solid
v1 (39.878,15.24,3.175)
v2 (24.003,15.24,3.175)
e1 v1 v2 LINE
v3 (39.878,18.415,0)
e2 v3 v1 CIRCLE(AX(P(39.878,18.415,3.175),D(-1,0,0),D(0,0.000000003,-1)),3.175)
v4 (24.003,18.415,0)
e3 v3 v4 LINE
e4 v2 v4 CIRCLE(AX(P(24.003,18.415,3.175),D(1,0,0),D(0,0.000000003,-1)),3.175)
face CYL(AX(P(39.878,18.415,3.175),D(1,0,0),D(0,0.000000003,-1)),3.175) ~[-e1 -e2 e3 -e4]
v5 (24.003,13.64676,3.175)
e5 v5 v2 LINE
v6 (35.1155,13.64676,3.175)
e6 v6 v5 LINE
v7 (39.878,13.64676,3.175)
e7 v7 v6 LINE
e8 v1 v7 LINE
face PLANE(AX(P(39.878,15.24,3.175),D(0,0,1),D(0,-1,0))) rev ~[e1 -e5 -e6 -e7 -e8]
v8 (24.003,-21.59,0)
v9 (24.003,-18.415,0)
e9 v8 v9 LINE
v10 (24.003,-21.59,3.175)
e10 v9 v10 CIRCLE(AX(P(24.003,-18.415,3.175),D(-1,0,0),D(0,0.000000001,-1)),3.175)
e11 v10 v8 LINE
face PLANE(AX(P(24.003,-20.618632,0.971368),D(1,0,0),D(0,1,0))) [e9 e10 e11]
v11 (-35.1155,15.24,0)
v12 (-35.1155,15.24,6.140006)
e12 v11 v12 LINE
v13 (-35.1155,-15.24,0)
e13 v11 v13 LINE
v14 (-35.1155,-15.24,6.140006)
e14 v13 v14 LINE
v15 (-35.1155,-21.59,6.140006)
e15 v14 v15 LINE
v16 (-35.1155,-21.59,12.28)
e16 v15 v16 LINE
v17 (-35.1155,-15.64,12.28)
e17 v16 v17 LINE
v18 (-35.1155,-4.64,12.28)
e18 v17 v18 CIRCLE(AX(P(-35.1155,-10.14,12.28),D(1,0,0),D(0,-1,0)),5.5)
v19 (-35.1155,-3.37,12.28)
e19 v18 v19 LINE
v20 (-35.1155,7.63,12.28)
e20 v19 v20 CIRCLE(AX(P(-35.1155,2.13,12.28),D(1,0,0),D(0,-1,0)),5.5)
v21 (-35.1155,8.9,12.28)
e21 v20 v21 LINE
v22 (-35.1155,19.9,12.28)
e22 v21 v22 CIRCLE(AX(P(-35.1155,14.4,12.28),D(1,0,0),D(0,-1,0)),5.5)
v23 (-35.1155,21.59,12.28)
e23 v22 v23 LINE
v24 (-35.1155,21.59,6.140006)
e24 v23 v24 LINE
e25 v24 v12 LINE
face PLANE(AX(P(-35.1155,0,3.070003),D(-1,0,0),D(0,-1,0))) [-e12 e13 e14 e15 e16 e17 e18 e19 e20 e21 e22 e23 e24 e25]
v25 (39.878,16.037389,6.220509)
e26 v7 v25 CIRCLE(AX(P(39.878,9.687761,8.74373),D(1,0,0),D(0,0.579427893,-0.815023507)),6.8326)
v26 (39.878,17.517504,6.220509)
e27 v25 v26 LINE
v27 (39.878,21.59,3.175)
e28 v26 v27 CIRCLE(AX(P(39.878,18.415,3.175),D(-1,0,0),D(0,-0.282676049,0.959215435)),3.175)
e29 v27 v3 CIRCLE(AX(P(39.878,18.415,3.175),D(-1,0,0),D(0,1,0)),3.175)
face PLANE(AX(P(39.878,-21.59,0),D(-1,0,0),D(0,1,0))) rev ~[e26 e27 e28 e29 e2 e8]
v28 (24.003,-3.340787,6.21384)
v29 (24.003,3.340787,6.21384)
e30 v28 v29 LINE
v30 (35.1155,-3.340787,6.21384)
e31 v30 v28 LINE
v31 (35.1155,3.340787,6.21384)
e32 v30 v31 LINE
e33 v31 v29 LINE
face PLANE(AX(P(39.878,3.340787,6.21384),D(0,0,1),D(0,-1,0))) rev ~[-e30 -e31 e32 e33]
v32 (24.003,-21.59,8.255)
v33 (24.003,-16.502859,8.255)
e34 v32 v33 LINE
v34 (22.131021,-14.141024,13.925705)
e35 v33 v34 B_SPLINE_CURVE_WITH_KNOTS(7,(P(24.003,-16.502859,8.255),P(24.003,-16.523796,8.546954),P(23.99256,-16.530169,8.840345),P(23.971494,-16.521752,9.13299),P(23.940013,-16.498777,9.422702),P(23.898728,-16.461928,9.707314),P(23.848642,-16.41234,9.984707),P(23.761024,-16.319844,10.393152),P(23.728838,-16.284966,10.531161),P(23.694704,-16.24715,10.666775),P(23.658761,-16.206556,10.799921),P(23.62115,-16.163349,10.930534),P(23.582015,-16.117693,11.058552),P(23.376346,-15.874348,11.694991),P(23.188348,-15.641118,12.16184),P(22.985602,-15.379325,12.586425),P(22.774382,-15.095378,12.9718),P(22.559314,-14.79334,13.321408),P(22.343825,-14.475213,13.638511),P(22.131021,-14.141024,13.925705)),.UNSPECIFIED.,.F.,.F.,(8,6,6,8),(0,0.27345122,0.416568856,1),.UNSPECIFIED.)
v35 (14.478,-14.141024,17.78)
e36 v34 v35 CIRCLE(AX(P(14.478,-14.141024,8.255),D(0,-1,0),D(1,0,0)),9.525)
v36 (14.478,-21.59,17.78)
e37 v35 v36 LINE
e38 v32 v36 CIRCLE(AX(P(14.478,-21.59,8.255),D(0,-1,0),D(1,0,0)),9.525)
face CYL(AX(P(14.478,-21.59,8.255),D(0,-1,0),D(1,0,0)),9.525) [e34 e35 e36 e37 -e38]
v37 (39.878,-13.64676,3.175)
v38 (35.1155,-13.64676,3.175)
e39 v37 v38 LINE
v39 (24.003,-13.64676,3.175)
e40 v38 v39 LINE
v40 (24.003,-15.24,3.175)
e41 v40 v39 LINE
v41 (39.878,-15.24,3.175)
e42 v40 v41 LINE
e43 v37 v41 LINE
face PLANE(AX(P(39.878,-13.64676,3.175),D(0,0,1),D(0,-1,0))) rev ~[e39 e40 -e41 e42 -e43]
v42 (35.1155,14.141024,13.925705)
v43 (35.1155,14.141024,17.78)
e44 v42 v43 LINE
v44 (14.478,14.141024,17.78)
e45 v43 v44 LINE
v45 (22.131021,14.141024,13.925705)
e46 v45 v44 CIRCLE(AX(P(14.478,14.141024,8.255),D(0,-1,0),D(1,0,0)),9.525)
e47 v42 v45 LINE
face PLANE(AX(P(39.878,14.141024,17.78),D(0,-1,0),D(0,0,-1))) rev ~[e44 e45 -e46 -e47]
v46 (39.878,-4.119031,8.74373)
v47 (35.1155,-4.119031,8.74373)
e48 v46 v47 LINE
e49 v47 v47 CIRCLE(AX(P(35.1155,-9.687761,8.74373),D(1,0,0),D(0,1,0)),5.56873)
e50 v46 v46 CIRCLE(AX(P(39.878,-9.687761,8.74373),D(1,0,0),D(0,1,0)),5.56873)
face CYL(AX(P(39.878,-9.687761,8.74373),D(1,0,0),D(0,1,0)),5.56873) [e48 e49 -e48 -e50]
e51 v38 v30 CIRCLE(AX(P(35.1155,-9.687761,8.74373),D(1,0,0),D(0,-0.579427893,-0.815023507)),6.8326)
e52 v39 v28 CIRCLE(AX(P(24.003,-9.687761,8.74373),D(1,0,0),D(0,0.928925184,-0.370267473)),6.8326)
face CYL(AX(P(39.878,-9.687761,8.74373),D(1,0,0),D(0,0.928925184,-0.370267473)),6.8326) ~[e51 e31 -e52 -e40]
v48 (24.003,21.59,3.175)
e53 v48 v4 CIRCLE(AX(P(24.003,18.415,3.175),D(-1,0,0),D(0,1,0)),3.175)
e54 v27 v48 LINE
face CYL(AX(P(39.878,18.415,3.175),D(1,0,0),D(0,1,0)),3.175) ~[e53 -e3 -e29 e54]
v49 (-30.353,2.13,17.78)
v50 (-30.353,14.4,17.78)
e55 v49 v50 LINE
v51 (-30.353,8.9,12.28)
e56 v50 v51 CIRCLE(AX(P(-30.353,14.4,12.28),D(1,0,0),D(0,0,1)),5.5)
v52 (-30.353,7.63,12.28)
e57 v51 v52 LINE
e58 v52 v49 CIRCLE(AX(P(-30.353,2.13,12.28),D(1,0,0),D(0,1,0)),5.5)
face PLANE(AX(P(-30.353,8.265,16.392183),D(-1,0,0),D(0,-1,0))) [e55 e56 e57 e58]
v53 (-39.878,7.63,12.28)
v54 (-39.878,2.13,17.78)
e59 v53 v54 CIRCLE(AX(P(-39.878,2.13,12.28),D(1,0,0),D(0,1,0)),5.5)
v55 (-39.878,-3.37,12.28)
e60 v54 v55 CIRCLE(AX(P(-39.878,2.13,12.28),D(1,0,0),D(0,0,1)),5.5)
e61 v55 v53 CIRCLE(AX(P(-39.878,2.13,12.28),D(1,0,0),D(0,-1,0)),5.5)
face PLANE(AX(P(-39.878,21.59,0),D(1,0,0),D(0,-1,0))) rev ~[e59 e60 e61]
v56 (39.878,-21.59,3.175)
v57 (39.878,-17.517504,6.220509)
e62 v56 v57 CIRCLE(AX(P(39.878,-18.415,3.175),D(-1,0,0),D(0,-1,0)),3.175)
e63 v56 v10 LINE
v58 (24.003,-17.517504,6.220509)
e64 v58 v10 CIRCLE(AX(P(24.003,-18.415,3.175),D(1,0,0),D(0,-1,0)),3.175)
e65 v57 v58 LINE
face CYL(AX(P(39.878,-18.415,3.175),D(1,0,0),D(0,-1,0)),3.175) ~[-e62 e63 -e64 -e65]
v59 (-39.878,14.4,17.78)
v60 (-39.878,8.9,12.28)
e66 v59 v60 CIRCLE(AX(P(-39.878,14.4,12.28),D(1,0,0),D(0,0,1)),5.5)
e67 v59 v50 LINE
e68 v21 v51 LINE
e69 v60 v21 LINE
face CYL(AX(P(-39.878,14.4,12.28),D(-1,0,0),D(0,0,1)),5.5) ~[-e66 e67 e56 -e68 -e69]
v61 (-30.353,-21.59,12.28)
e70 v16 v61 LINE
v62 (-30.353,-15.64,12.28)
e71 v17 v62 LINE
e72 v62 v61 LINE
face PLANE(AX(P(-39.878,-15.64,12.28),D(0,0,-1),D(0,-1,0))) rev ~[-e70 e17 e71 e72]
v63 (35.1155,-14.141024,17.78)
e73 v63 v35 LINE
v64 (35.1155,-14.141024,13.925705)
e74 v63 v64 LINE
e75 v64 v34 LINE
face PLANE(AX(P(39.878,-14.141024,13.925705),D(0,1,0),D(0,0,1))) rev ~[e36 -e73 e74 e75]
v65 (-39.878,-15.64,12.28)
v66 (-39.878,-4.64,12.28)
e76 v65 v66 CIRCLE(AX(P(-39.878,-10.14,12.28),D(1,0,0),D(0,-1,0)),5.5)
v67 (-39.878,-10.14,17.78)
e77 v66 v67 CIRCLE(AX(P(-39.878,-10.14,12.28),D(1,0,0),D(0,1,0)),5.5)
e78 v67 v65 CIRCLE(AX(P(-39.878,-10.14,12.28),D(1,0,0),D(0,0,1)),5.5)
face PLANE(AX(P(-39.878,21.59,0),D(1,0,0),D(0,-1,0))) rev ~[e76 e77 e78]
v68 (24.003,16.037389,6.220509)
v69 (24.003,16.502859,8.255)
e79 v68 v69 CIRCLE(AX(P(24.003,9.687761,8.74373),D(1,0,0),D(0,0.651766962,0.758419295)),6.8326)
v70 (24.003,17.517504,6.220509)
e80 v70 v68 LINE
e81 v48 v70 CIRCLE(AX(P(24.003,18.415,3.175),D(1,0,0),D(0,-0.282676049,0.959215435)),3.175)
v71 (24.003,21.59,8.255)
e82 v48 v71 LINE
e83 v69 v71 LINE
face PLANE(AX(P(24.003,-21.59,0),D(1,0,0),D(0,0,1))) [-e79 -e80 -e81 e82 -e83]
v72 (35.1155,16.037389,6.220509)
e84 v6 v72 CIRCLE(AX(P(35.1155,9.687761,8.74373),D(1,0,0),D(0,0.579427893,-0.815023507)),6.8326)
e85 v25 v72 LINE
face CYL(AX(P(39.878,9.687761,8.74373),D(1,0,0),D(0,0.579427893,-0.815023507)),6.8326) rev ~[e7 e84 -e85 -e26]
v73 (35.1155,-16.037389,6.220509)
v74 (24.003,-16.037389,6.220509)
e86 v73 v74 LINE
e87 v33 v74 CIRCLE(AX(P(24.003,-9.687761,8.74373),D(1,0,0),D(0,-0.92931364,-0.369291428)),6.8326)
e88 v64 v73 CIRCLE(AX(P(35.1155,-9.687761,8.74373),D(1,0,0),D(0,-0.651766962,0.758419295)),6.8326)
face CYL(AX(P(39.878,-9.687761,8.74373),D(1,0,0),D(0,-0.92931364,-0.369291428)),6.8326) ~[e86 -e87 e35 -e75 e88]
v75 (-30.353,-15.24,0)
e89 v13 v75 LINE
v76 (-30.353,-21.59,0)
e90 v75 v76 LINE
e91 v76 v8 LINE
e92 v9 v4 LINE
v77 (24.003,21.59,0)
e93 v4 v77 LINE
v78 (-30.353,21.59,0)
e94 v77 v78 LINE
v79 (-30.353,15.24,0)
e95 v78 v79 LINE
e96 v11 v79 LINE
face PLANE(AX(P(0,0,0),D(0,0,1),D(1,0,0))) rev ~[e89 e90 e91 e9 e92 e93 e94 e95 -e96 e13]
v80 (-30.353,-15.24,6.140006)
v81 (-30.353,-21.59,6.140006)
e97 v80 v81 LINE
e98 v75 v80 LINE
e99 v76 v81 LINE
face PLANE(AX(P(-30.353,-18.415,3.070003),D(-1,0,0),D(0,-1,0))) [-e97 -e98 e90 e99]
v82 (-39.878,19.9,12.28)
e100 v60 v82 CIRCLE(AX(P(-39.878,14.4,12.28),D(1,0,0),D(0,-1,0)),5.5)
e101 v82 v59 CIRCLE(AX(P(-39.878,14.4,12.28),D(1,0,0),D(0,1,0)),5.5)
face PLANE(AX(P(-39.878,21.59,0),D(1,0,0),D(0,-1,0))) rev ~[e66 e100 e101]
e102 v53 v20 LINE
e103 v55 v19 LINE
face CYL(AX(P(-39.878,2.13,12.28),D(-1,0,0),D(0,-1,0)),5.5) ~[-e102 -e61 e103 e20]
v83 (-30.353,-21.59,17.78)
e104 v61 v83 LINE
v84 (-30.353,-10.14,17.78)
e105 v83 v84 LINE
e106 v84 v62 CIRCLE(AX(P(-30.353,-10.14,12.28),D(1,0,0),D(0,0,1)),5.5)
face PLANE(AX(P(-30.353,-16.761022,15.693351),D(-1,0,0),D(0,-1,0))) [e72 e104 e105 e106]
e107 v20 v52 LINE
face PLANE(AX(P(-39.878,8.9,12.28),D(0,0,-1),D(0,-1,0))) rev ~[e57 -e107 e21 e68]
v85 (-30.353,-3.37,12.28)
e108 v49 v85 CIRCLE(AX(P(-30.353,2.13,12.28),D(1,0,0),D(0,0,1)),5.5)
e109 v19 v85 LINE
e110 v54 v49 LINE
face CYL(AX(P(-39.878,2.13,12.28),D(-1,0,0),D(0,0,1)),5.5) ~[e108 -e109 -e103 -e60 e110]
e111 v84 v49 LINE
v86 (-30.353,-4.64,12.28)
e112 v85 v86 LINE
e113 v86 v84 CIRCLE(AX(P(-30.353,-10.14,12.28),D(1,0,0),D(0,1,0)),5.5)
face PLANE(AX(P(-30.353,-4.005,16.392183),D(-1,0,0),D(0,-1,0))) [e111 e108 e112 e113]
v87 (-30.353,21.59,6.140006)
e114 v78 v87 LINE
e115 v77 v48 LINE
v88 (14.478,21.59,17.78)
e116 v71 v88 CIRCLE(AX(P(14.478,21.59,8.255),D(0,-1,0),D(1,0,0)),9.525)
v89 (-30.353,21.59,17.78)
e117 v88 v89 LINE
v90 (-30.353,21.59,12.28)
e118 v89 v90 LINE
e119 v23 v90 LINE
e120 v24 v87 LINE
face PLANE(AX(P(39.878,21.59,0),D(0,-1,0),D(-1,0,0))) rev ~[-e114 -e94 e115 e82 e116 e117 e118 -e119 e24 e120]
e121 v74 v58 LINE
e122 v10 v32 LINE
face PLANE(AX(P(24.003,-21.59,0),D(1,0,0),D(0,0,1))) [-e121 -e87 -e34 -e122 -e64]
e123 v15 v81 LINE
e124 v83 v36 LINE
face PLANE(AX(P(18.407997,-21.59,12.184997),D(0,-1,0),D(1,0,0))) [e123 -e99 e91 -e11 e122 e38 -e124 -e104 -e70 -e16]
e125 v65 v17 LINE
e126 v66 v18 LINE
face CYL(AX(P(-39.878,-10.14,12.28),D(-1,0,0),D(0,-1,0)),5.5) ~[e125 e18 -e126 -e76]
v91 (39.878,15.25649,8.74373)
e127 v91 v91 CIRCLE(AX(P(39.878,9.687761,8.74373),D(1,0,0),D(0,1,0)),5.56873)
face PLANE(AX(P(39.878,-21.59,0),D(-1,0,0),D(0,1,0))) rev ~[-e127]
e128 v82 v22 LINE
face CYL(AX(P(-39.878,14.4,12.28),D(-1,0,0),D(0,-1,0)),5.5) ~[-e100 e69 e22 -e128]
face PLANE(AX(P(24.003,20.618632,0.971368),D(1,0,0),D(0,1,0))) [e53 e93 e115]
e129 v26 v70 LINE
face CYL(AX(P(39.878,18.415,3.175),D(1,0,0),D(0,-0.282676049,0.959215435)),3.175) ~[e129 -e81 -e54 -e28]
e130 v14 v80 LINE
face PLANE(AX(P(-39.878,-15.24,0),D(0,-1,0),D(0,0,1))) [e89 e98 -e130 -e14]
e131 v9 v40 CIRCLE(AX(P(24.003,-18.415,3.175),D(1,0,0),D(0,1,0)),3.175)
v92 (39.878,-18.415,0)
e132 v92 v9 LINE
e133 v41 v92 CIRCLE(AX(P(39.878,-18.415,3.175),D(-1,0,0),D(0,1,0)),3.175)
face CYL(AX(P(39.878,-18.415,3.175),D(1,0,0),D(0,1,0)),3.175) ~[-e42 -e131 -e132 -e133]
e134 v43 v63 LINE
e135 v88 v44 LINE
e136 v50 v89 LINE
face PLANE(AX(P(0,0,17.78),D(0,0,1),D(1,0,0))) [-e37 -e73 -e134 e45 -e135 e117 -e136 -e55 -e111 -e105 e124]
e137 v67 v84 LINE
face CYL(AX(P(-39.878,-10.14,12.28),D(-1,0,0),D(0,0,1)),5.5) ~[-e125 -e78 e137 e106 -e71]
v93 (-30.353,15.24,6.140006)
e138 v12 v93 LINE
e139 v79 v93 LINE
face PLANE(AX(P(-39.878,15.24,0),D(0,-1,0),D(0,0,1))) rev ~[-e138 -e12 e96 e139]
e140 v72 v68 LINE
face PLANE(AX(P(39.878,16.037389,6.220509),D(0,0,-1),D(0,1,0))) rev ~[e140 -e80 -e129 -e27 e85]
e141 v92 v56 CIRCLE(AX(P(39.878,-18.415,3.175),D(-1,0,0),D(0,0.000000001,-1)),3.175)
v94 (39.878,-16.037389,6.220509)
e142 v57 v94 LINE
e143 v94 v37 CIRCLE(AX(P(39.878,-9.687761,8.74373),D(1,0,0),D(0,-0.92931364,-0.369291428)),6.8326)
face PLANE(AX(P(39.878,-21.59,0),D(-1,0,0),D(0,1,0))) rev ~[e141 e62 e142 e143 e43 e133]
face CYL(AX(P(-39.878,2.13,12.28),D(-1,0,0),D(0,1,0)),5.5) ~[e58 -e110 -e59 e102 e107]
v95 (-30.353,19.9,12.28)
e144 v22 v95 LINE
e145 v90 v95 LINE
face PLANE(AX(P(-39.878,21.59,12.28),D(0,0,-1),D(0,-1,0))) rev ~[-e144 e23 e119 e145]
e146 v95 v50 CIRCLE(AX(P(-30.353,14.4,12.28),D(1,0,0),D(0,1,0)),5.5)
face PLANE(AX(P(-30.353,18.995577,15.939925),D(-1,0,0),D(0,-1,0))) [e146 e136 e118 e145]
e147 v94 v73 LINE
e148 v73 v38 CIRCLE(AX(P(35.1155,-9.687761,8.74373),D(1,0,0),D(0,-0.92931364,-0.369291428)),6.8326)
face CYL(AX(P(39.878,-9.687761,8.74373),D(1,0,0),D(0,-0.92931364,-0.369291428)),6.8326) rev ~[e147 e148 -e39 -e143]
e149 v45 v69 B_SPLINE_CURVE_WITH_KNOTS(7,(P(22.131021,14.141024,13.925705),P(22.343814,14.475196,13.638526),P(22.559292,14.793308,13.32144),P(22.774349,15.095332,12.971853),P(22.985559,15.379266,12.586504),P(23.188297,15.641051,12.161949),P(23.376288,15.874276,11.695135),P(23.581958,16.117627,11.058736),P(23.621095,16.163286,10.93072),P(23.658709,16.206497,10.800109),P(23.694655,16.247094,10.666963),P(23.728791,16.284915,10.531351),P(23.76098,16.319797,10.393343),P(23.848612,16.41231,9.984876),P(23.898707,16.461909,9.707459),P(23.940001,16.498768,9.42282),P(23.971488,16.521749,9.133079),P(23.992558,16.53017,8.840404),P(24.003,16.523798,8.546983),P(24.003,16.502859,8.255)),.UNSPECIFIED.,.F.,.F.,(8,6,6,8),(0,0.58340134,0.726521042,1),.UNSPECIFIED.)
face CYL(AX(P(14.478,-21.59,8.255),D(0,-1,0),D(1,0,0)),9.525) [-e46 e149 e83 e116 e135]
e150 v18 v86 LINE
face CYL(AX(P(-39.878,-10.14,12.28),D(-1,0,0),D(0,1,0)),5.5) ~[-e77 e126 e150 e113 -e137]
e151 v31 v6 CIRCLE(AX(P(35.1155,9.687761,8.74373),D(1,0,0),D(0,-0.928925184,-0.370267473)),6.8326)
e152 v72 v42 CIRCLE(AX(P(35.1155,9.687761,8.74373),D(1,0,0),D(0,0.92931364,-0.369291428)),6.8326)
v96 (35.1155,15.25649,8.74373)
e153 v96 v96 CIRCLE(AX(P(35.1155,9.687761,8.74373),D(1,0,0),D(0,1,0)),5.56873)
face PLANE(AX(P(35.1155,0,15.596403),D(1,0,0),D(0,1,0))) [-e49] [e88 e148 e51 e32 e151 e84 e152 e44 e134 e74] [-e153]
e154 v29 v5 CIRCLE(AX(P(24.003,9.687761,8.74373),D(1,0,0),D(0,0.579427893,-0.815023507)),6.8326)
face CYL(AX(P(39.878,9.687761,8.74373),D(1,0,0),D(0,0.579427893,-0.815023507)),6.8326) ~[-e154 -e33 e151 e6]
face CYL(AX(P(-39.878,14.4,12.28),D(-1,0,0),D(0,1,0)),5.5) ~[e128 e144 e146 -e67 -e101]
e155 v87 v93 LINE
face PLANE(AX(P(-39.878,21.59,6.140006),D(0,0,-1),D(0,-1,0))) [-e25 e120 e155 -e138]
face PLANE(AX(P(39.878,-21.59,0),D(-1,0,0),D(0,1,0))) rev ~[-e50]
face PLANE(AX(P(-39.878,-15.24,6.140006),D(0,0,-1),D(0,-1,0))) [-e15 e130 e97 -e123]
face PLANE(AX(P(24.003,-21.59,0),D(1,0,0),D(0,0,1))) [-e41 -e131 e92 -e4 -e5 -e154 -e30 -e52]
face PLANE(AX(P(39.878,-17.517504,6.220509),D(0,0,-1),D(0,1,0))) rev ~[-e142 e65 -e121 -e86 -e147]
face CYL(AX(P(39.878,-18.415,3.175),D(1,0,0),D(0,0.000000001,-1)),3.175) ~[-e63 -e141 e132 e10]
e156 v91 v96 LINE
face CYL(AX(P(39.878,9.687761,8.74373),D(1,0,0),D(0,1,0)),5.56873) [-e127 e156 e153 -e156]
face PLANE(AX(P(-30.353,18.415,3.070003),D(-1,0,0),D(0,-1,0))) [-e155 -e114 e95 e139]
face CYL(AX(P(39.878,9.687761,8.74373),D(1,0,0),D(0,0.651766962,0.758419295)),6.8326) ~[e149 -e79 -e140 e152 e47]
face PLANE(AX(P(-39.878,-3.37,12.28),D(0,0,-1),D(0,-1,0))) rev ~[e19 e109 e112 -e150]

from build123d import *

# Parameters (mm, degrees)
F1_DEPTH  = 17.78
F2_W      = 6.35
F2_H      = 6.1400055
F3_DEPTH  = 9.525
F2_W_2    = 30.48
F4_DEPTH  = 4.7625
F5_R      = 5.5687296145
F6_DEPTH  = 4.7625
F7_DEPTH  = 17.4625
F8_DEPTH  = 25.4
F9_DEPTH  = 15.875
F10_W     = 9.525
F10_H     = 5.08
F10_H_2   = 3.175
F11_DEPTH = 43.18


# Not quite as in the source:
# - a length typed as a fraction of an inch, garbled in the dataset ("3 / 203.2 mm" for 3/8 in), is restored
# - a feature names something its author has since deleted; it is built from what else it names


with BuildPart() as f1:
    # F0 (on Top) → F1 (new body)
    with BuildSketch(Plane.XY):
        Polygon((-39.878, 21.59), (-39.878, 0), (-39.878, -21.59), (39.878, -21.59), (39.878, 0), (39.878, 21.59), align=None)
    extrude(amount=F1_DEPTH)

    # F2 (on face) → F3 (cut)
    with BuildSketch(Plane(origin=(-39.878, 0, 0), x_dir=(0, -1, 0), z_dir=(-1, 0, 0))):
        with Locations((-18.415, 3.07000275)):
            Rectangle(F2_W, F2_H)
        with Locations((18.415, 3.07000275)):
            Rectangle(F2_W, F2_H)
        with BuildLine():
            Line((-21.59, 17.78), (-21.59, 12.28))
            Line((-21.59, 12.28), (-19.9, 12.28))
            ThreePointArc((-19.9, 12.28), (-18.2890872965, 16.1690872965), (-14.4, 17.78))
            Line((-14.4, 17.78), (-21.59, 17.78))
        make_face()
        with BuildLine():
            Line((-2.13, 17.78), (-14.4, 17.78))
            ThreePointArc((-14.4, 17.78), (-10.5109127035, 16.1690872965), (-8.9, 12.28))
            Line((-8.9, 12.28), (-7.63, 12.28))
            ThreePointArc((-7.63, 12.28), (-6.0190872965, 16.1690872965), (-2.13, 17.78))
        make_face()
        with BuildLine():
            Line((15.64, 12.28), (21.59, 12.28))
            Line((21.59, 12.28), (21.59, 17.78))
            Line((21.59, 17.78), (10.14, 17.78))
            ThreePointArc((10.14, 17.78), (14.0290872965, 16.1690872965), (15.64, 12.28))
        make_face()
        with BuildLine():
            Line((10.14, 17.78), (-2.13, 17.78))
            ThreePointArc((-2.13, 17.78), (1.7590872965, 16.1690872965), (3.37, 12.28))
            Line((3.37, 12.28), (4.64, 12.28))
            ThreePointArc((4.64, 12.28), (6.2509127035, 16.1690872965), (10.14, 17.78))
        make_face()
    extrude(amount=-F3_DEPTH, mode=Mode.SUBTRACT)

    # F2 (on face) → F4 (cut)
    with BuildSketch(Plane(origin=(-39.878, 0, 0), x_dir=(0, -1, 0), z_dir=(-1, 0, 0))):
        with Locations((0, 3.07000275)):
            Rectangle(F2_W_2, F2_H)
        with BuildLine():
            Line((-21.59, 12.28), (-21.59, 6.1400055))
            Line((-21.59, 6.1400055), (-15.24, 6.1400055))
            Line((-15.24, 6.1400055), (15.24, 6.1400055))
            Line((15.24, 6.1400055), (21.59, 6.1400055))
            Line((21.59, 6.1400055), (21.59, 12.28))
            Line((21.59, 12.28), (15.64, 12.28))
            ThreePointArc((15.64, 12.28), (10.14, 6.78), (4.64, 12.28))
            Line((4.64, 12.28), (3.37, 12.28))
            ThreePointArc((3.37, 12.28), (-2.13, 6.78), (-7.63, 12.28))
            Line((-7.63, 12.28), (-8.9, 12.28))
            ThreePointArc((-8.9, 12.28), (-14.4, 6.78), (-19.9, 12.28))
            Line((-19.9, 12.28), (-21.59, 12.28))
        make_face()
    extrude(amount=-F4_DEPTH, mode=Mode.SUBTRACT)

    # F5 (on face) → F6 (cut)
    with BuildSketch(Plane.YZ.offset(39.878)):
        with BuildLine():
            Line((14.1410236641, 17.78), (-14.1410236641, 17.78))
            Line((-14.1410236641, 17.78), (-14.1410236641, 13.925705291))
            ThreePointArc((-14.1410236641, 13.925705291), (-8.0583664109, 15.3792022386), (-3.3407865054, 11.2736191532))
            Line((-3.3407865054, 11.2736191532), (3.3407865054, 11.2736191532))
            ThreePointArc((3.3407865054, 11.2736191532), (8.0583664109, 15.3792022386), (14.1410236641, 13.925705291))
            Line((14.1410236641, 13.925705291), (14.1410236641, 17.78))
        make_face()
        with BuildLine():
            ThreePointArc((-14.1410236641, 13.925705291), (-16.3223765845, 10.3766090016), (-16.0373890971, 6.2205090068))
            ThreePointArc((-16.0373890971, 6.2205090068), (-15.0623054432, 4.5248800343), (-13.6467597401, 3.175))
            ThreePointArc((-13.6467597401, 3.175), (-7.7553416056, 2.1900909973), (-3.3407865054, 6.2138400758))
            Line((-3.3407865054, 6.2138400758), (3.3407865054, 6.2138400758))
            ThreePointArc((3.3407865054, 6.2138400758), (7.7553416056, 2.1900909973), (13.6467597401, 3.175))
            ThreePointArc((13.6467597401, 3.175), (15.0623054432, 4.5248800343), (16.0373890971, 6.2205090068))
            ThreePointArc((16.0373890971, 6.2205090068), (16.3223765845, 10.3766090016), (14.1410236641, 13.925705291))
            ThreePointArc((14.1410236641, 13.925705291), (8.0583664109, 15.3792022386), (3.3407865054, 11.2736191532))
            Line((3.3407865054, 11.2736191532), (-3.3407865054, 11.2736191532))
            ThreePointArc((-3.3407865054, 11.2736191532), (-8.0583664109, 15.3792022386), (-14.1410236641, 13.925705291))
        make_face()
        with Locations((-9.6877607201, 8.7437296145)):
            Circle(F5_R, mode=Mode.SUBTRACT)
        with Locations((9.6877607201, 8.7437296145)):
            Circle(F5_R, mode=Mode.SUBTRACT)
    extrude(amount=-F6_DEPTH, mode=Mode.SUBTRACT)

    # F5 (on face) → F7 (cut)
    with BuildSketch(Plane.YZ.offset(39.878)):
        with BuildLine():
            ThreePointArc((-15.24, 3.175), (-16.1699359684, 0.9299359711), (-18.4149999962, 0))
            Line((-18.4149999962, 0), (-12.0420521125, 0))
            Line((-12.0420521125, 0), (18.41500001, 0))
            ThreePointArc((18.41500001, 0), (16.1699359733, 0.9299359662), (15.24, 3.175))
            Line((15.24, 3.175), (13.6467597401, 3.175))
            ThreePointArc((13.6467597401, 3.175), (7.7553416056, 2.1900909973), (3.3407865054, 6.2138400758))
            Line((3.3407865054, 6.2138400758), (-3.3407865054, 6.2138400758))
            ThreePointArc((-3.3407865054, 6.2138400758), (-7.7553416056, 2.1900909973), (-13.6467597401, 3.175))
            Line((-13.6467597401, 3.175), (-15.24, 3.175))
        make_face()
    extrude(amount=-F7_DEPTH, mode=Mode.SUBTRACT)

    # F5 (on face) → F8 (cut)
    with BuildSketch(Plane.YZ.offset(39.878)):
        with BuildLine():
            Line((-21.59, 17.78), (-21.59, 3.175))
            ThreePointArc((-21.59, 3.175), (-20.3164565142, 5.7176537563), (-17.5175035436, 6.2205090068))
            Line((-17.5175035436, 6.2205090068), (-16.0373890971, 6.2205090068))
            ThreePointArc((-16.0373890971, 6.2205090068), (-16.3223765845, 10.3766090016), (-14.1410236641, 13.925705291))
            Line((-14.1410236641, 13.925705291), (-14.1410236641, 17.78))
            Line((-14.1410236641, 17.78), (-21.59, 17.78))
        make_face()
        with BuildLine():
            Line((21.59, 17.78), (14.1410236641, 17.78))
            Line((14.1410236641, 17.78), (14.1410236641, 13.925705291))
            ThreePointArc((14.1410236641, 13.925705291), (16.3223765845, 10.3766090016), (16.0373890971, 6.2205090068))
            Line((16.0373890971, 6.2205090068), (17.5175035436, 6.2205090068))
            ThreePointArc((17.5175035436, 6.2205090068), (20.3164565142, 5.7176537563), (21.59, 3.175))
            Line((21.59, 3.175), (21.59, 17.78))
        make_face()
    extrude(amount=-F8_DEPTH, mode=Mode.SUBTRACT)

    # F5 (on face) → F9 (cut)
    with BuildSketch(Plane.YZ.offset(39.878)):
        with BuildLine():
            Line((-21.59, 3.175), (-21.59, 0))
            Line((-21.59, 0), (-18.4149999962, 0))
            ThreePointArc((-18.4149999962, 0), (-20.6600640289, 0.9299359684), (-21.59, 3.175))
        make_face()
        with BuildLine():
            ThreePointArc((-15.24, 3.175), (-16.1699359684, 0.9299359711), (-18.4149999962, 0))
            Line((-18.4149999962, 0), (-12.0420521125, 0))
            Line((-12.0420521125, 0), (18.41500001, 0))
            ThreePointArc((18.41500001, 0), (16.1699359733, 0.9299359662), (15.24, 3.175))
            Line((15.24, 3.175), (13.6467597401, 3.175))
            ThreePointArc((13.6467597401, 3.175), (7.7553416056, 2.1900909973), (3.3407865054, 6.2138400758))
            Line((3.3407865054, 6.2138400758), (-3.3407865054, 6.2138400758))
            ThreePointArc((-3.3407865054, 6.2138400758), (-7.7553416056, 2.1900909973), (-13.6467597401, 3.175))
            Line((-13.6467597401, 3.175), (-15.24, 3.175))
        make_face()
        with BuildLine():
            ThreePointArc((21.59, 3.175), (20.6600640338, 0.9299359733), (18.41500001, 0))
            Line((18.41500001, 0), (21.59, 0))
            Line((21.59, 0), (21.59, 3.175))
        make_face()
    extrude(amount=-F9_DEPTH, mode=Mode.SUBTRACT)

    # F10 (on face) → F11 (join)
    with BuildSketch(Plane.XZ.offset(21.59)):
        with BuildLine():
            ThreePointArc((24.003, 8.255), (21.2131920908, 14.9901920908), (14.478, 17.78))
            Line((14.478, 17.78), (14.478, 8.255))
            Line((14.478, 8.255), (24.003, 8.255))
        make_face()
        with Locations((19.2405, 5.715)):
            Rectangle(F10_W, F10_H)
        with Locations((19.2405, 1.5875)):
            Rectangle(F10_W, F10_H_2)
    extrude(amount=-F11_DEPTH)


solid = f1.part
